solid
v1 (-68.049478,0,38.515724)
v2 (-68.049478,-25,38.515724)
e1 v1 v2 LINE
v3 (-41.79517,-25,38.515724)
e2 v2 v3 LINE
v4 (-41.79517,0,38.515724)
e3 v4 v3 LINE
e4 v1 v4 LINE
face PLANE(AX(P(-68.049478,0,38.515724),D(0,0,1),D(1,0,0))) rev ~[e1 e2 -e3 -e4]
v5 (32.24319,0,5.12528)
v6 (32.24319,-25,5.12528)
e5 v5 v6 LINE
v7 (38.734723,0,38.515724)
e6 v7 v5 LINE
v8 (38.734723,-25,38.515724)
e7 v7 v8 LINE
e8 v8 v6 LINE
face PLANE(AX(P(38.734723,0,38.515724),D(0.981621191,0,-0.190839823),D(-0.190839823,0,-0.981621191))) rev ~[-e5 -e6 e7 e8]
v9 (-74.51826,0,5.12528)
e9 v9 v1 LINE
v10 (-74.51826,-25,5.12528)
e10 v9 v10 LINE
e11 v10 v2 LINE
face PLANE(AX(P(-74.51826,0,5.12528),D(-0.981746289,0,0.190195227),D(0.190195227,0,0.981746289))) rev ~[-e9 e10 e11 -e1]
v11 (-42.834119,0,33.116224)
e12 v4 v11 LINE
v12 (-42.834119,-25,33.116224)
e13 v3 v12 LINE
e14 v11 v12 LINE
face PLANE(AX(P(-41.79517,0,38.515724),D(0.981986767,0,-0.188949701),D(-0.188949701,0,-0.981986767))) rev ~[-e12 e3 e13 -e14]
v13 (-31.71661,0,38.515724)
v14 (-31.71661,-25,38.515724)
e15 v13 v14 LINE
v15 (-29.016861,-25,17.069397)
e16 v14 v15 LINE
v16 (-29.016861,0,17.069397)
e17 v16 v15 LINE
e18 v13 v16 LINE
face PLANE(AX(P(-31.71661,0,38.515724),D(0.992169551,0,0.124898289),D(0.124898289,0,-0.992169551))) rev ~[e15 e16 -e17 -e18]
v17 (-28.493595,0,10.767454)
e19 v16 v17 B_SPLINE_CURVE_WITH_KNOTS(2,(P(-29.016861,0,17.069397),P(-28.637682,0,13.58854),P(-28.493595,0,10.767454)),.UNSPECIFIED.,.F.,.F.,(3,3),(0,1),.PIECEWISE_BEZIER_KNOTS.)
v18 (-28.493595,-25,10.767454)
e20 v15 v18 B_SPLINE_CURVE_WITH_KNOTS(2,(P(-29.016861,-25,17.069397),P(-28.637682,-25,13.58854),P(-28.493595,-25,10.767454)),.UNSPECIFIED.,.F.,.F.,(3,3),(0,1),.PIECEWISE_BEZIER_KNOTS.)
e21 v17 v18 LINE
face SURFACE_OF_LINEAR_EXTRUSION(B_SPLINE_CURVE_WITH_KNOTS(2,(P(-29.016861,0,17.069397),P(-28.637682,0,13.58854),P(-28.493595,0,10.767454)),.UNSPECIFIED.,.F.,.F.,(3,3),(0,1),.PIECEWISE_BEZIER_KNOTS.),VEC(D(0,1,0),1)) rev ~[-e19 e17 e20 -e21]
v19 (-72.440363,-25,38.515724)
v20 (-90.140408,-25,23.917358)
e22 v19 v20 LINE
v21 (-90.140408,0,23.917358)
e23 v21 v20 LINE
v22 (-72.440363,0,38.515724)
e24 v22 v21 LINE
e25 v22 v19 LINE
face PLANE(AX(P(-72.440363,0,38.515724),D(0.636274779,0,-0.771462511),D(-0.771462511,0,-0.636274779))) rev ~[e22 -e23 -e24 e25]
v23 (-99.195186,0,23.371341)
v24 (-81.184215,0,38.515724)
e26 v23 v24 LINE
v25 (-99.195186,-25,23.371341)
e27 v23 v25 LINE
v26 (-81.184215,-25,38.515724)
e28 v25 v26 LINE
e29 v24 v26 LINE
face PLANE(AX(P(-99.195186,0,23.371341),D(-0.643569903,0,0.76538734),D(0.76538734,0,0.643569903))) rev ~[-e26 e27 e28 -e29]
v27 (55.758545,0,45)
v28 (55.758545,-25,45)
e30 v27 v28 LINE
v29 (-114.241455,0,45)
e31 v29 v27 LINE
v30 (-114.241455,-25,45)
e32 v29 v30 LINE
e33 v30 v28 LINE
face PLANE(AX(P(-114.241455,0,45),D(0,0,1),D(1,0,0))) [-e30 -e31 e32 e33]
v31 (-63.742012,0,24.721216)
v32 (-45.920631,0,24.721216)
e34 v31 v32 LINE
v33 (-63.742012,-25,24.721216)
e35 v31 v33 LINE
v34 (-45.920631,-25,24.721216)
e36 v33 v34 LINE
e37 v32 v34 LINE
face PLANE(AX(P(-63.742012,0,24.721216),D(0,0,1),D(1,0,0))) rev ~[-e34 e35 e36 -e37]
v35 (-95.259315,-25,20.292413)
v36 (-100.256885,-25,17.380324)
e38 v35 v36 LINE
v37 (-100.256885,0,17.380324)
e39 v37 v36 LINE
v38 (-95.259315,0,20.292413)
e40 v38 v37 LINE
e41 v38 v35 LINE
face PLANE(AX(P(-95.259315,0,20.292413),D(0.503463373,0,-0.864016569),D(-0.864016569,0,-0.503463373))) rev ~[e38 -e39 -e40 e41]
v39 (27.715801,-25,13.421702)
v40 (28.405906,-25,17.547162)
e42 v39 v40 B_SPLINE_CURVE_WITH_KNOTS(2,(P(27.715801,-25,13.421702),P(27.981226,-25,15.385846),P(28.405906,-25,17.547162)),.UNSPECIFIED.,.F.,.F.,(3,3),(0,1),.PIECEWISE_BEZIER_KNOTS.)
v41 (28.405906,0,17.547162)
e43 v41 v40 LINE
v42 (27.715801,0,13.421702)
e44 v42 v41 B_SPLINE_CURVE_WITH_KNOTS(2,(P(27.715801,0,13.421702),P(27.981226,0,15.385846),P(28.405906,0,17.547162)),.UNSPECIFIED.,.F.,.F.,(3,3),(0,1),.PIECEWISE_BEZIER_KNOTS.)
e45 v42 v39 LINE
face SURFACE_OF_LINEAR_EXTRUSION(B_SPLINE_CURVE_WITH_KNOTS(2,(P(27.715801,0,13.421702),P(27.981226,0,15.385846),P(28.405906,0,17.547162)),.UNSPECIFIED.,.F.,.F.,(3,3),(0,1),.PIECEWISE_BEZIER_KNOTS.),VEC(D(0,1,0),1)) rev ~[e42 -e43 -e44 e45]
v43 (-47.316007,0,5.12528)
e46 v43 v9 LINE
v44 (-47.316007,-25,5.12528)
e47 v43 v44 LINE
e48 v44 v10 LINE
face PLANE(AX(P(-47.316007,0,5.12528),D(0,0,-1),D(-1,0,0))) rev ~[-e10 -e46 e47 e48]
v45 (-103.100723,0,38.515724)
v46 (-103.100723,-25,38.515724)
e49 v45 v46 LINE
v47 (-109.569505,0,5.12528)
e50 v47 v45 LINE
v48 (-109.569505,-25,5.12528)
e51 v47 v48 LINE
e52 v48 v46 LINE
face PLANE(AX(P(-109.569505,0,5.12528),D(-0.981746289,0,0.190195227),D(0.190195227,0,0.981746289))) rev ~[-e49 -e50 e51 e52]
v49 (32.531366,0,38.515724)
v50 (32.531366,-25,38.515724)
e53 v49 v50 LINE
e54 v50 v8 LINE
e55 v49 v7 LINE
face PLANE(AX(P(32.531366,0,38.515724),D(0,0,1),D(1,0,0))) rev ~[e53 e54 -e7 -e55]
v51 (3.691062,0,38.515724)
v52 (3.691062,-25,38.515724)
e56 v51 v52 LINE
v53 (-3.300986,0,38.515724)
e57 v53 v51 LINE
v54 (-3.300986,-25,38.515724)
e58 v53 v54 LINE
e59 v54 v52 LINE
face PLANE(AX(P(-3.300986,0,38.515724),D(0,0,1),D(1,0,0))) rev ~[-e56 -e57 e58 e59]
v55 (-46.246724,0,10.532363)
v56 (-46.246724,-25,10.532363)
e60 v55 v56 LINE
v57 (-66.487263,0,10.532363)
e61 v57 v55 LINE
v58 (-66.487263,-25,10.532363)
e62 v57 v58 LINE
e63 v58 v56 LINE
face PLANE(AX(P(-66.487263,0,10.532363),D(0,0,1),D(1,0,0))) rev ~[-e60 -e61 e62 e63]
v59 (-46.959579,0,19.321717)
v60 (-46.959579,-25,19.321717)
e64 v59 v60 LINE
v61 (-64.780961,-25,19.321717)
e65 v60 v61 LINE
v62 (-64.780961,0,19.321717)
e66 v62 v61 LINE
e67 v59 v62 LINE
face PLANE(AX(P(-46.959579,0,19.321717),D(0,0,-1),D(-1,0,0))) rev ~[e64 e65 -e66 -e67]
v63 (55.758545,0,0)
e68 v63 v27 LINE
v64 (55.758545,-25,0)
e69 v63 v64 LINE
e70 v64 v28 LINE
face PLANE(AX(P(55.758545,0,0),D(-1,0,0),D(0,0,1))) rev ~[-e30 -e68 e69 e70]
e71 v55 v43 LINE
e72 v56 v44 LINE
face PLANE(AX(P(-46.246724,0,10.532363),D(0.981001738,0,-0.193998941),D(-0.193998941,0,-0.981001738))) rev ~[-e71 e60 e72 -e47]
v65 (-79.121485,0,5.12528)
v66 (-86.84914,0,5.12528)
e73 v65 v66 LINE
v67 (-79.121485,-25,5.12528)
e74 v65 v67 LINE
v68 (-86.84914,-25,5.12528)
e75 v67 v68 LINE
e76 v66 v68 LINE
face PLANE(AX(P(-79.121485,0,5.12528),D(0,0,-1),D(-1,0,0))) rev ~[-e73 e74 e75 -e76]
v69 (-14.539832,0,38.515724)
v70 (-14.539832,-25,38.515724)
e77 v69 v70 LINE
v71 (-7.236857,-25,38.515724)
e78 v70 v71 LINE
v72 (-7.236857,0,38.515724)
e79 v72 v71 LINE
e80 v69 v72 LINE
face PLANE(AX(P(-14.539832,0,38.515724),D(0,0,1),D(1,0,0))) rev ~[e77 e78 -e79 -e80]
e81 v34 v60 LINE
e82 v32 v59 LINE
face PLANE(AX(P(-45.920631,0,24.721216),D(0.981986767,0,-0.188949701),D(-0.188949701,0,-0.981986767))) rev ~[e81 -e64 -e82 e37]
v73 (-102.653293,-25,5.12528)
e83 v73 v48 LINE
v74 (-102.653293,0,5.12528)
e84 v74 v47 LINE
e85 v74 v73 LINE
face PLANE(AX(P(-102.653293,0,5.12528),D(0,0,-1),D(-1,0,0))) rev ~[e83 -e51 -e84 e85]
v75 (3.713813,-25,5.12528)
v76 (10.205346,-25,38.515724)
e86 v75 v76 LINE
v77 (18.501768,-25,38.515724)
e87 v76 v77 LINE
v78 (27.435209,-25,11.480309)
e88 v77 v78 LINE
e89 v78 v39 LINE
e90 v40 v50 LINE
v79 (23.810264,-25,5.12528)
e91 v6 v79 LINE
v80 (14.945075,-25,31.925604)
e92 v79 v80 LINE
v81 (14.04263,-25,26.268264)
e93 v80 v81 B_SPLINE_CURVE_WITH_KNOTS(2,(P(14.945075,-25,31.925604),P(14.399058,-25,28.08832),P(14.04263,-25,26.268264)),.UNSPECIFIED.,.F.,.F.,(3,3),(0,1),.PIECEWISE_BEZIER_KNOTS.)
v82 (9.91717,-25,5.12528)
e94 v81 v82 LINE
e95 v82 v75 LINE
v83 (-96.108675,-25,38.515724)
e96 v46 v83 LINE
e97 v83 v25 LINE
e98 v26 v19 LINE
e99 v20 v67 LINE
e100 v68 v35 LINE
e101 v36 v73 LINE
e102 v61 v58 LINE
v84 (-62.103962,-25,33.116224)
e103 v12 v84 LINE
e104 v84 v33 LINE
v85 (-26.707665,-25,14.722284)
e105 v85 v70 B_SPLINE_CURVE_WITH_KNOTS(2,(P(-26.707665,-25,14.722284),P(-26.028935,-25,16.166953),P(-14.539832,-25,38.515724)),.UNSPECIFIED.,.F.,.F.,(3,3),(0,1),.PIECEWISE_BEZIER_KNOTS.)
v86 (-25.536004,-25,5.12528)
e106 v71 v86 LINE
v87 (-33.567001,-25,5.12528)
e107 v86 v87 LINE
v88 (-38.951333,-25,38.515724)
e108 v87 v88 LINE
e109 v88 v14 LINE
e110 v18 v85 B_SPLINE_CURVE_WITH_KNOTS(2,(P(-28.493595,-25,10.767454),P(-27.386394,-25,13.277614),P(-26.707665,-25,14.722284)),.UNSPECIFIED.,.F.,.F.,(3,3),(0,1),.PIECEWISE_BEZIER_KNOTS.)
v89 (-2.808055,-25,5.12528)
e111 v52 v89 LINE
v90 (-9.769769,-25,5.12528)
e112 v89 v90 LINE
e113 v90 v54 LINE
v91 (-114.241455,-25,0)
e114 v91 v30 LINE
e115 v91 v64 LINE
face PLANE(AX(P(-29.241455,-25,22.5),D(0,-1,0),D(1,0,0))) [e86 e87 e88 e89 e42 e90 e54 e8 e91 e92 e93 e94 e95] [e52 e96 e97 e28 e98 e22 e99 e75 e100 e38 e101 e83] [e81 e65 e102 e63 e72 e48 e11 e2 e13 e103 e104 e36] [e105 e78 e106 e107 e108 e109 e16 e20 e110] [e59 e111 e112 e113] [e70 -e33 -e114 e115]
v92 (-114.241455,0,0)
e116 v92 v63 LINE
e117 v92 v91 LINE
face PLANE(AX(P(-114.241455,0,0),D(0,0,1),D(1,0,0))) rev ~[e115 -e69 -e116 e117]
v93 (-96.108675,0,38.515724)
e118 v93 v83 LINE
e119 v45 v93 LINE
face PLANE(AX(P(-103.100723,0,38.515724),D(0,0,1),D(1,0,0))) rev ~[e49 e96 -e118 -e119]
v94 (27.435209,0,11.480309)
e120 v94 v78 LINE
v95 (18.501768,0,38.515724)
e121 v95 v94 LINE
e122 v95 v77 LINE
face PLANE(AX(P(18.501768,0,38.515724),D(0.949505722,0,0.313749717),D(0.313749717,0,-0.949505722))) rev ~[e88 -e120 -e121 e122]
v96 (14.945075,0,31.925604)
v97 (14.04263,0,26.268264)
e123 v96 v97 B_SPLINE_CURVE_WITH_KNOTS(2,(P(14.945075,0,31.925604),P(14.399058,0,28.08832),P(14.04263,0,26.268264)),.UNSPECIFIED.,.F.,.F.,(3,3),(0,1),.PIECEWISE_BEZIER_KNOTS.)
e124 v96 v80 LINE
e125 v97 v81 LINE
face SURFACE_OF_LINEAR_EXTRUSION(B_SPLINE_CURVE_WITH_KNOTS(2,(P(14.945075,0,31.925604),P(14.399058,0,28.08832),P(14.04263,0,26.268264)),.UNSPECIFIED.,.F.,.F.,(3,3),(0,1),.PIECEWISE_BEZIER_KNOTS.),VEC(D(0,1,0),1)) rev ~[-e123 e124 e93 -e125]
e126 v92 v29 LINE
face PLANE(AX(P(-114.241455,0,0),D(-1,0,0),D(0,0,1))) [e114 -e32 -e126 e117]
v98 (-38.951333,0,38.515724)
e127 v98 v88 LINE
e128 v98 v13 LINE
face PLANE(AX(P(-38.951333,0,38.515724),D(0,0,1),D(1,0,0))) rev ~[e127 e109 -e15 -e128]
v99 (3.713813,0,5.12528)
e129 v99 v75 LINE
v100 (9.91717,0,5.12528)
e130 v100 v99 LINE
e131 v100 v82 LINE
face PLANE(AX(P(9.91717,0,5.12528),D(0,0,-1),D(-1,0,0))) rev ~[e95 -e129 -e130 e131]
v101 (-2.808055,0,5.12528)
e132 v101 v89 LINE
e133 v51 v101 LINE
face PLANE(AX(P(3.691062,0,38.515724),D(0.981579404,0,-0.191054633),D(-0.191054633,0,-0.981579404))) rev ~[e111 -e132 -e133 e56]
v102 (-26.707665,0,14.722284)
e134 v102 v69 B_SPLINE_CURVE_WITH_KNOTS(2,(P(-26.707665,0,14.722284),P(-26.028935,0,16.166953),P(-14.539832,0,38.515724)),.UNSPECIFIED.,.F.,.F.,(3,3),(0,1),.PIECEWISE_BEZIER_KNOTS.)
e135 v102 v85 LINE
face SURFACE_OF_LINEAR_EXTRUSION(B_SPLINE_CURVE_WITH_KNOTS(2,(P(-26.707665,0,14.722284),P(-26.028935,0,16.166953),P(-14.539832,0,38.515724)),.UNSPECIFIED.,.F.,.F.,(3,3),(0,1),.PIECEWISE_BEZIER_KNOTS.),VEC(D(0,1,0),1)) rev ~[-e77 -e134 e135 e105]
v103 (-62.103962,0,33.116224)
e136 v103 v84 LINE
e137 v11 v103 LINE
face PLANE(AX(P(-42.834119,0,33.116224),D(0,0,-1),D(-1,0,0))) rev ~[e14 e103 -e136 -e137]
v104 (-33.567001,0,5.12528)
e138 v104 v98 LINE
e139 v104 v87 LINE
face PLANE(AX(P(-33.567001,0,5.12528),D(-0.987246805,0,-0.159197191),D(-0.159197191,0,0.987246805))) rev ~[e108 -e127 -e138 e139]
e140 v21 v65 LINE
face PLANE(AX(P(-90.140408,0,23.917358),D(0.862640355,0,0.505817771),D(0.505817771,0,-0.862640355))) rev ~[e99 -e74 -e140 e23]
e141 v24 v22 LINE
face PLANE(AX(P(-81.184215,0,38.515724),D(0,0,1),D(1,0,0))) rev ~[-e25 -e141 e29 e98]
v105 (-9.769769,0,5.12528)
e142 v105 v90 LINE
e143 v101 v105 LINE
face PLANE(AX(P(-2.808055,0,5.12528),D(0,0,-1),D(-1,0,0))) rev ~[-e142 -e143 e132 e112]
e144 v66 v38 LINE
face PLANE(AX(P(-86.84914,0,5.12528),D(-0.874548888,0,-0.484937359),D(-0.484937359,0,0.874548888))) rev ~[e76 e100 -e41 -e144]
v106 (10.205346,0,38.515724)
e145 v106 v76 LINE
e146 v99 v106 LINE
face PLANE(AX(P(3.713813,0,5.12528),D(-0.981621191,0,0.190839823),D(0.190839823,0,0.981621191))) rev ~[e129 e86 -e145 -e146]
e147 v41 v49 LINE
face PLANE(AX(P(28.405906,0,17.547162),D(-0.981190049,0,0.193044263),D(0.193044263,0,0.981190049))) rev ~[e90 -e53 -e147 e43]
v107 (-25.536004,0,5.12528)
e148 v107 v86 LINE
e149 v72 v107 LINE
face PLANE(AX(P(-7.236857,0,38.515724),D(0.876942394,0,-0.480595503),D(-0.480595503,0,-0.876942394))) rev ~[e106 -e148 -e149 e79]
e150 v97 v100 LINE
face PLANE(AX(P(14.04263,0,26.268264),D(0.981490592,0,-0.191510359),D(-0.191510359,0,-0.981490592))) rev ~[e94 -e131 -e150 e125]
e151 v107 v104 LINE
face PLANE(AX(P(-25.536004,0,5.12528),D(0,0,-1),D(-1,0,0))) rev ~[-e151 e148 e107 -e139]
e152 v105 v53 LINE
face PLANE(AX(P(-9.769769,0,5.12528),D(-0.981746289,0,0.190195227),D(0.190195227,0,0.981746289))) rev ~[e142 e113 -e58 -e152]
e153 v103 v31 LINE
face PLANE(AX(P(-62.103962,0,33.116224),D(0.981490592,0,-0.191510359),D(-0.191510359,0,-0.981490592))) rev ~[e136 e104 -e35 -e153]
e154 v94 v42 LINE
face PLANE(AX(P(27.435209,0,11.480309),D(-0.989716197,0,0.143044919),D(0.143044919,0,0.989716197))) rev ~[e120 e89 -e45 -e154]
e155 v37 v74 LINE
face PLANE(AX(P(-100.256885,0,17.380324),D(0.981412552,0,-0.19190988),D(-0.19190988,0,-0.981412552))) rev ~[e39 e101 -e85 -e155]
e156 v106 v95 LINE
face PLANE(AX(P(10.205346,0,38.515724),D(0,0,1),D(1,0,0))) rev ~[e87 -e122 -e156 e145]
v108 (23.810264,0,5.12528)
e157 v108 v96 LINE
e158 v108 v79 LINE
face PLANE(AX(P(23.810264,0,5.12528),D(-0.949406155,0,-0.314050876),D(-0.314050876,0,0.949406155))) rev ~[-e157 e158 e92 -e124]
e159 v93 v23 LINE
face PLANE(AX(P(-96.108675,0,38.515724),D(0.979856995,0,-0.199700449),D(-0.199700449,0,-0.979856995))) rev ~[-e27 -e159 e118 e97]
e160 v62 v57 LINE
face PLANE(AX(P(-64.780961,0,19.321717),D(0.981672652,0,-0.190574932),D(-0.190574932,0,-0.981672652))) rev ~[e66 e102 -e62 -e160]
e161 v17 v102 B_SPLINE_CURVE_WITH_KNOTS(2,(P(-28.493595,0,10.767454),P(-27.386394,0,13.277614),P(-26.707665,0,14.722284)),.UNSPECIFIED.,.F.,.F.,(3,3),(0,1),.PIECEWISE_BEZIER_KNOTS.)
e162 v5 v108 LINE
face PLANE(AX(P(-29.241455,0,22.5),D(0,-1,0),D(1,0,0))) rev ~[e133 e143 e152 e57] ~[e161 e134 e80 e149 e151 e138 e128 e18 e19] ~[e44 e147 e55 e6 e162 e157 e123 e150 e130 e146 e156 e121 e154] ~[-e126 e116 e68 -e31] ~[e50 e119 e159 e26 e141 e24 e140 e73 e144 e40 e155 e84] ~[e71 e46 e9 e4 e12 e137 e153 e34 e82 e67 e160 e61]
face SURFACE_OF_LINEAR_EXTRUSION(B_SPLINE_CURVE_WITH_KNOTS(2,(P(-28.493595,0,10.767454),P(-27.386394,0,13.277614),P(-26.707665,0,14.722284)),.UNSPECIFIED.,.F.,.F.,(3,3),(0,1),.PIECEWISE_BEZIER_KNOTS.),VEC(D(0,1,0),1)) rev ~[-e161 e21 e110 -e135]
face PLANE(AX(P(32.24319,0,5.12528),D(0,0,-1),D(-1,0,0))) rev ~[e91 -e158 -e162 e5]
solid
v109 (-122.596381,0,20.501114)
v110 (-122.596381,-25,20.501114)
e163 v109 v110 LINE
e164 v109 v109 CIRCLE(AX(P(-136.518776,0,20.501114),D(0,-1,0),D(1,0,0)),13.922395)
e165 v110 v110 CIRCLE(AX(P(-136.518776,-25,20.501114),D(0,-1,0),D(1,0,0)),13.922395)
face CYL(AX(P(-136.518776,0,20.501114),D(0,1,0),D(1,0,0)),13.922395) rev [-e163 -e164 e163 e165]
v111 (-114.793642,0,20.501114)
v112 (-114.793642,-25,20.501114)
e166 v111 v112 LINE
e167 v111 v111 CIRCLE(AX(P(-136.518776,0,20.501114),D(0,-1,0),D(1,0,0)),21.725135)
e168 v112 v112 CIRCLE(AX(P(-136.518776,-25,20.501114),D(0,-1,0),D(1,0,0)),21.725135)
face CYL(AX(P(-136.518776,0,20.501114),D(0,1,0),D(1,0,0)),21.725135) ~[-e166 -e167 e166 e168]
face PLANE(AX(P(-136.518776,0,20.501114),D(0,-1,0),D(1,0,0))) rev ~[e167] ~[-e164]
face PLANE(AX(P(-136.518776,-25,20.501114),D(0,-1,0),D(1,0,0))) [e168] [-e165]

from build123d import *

# Parameters (mm, degrees)
F0_W     = 170
F0_H     = 45
F1_DEPTH = 25
F0_R     = 21.7251346757
F0_R_2   = 13.9223950692


with BuildPart() as f1:
    # F0 (on Front) → F1 (new body)
    with BuildSketch(Plane.XZ):
        with Locations((-29.2414551138, 22.5)):
            Rectangle(F0_W, F0_H)
        Polygon((-79.1214853234, 5.125280004), (-86.849139698, 5.125280004), (-95.2593150675, 20.2924132221), (-100.2568854628, 17.3803236442), (-102.6532925113, 5.125280004), (-109.5695052588, 5.125280004), (-103.1007229412, 38.5157237837), (-96.1086745277, 38.5157237837), (-99.1951861376, 23.3713412654), (-81.1842154411, 38.5157237837), (-72.4403631408, 38.5157237837), (-90.1404076064, 23.9173580612), align=None, mode=Mode.SUBTRACT)
        Polygon((-47.316006965, 5.125280004), (-74.5182603917, 5.125280004), (-68.0494780742, 38.5157237837), (-41.7951704737, 38.5157237837), (-42.8341190991, 33.116224358), (-62.1039618527, 33.116224358), (-63.7420122403, 24.7212161218), (-45.920630709, 24.7212161218), (-46.9595793344, 19.3217166961), (-64.7809608657, 19.3217166961), (-66.4872633527, 10.5323629962), (-46.2467240732, 10.5323629962), align=None, mode=Mode.SUBTRACT)
        with BuildLine():
            Line((-7.2368574362, 38.5157237837), (-25.5360036638, 5.125280004))
            Line((-25.5360036638, 5.125280004), (-33.5670007028, 5.125280004))
            Line((-33.5670007028, 5.125280004), (-38.9513329953, 38.5157237837))
            Line((-38.9513329953, 38.5157237837), (-31.7166104502, 38.5157237837))
            Line((-31.7166104502, 38.5157237837), (-29.0168607374, 17.0693974133))
            add(Edge.make_bspline(
                [(-29.0168607374, 17.0693974133), (-28.637682407, 13.5885403397), (-28.4935946414, 10.7674535611)],
                knots=[0, 0, 0, 1, 1, 1], degree=2))
            add(Edge.make_bspline(
                [(-28.4935946414, 10.7674535611), (-27.3863939165, 13.2776141087), (-26.7076647049, 14.7222835478)],
                knots=[0, 0, 0, 1, 1, 1], degree=2))
            add(Edge.make_bspline(
                [(-26.7076647049, 14.7222835478), (-26.0289354934, 16.1669529868), (-14.5398320807, 38.5157237837)],
                knots=[0, 0, 0, 1, 1, 1], degree=2))
            Line((-14.5398320807, 38.5157237837), (-7.2368574362, 38.5157237837))
        make_face(mode=Mode.SUBTRACT)
        Polygon((-2.8080545365, 5.125280004), (-9.7697686836, 5.125280004), (-3.3009863661, 38.5157237837), (3.6910620474, 38.5157237837), align=None, mode=Mode.SUBTRACT)
        with BuildLine():
            Line((32.2431903305, 5.125280004), (23.8102642613, 5.125280004))
            Line((23.8102642613, 5.125280004), (14.9450748953, 31.9256044004))
            add(Edge.make_bspline(
                [(14.9450748953, 31.9256044004), (14.3990580994, 28.0883196962), (14.0426304688, 26.26826371)],
                knots=[0, 0, 0, 1, 1, 1], degree=2))
            Line((14.0426304688, 26.26826371), (9.9171702335, 5.125280004))
            Line((9.9171702335, 5.125280004), (3.7138127473, 5.125280004))
            Line((3.7138127473, 5.125280004), (10.2053457646, 38.5157237837))
            Line((10.2053457646, 38.5157237837), (18.5017676349, 38.5157237837))
            Line((18.5017676349, 38.5157237837), (27.4352091004, 11.4803088224))
            Line((27.4352091004, 11.4803088224), (27.7158010649, 13.4217018743))
            add(Edge.make_bspline(
                [(27.7158010649, 13.4217018743), (27.9812258962, 15.385845626), (28.4059056263, 17.5471621096)],
                knots=[0, 0, 0, 1, 1, 1], degree=2))
            Line((28.4059056263, 17.5471621096), (32.5313658617, 38.5157237837))
            Line((32.5313658617, 38.5157237837), (38.7347233479, 38.5157237837))
            Line((38.7347233479, 38.5157237837), (32.2431903305, 5.125280004))
        make_face(mode=Mode.SUBTRACT)
    extrude(amount=F1_DEPTH)


with BuildPart() as f1b:
    # F0 (on Front) → F1, piece 2 (new body)
    with BuildSketch(Plane.XZ):
        with Locations((-136.5187764168, 20.501114428)):
            Circle(F0_R)
        with Locations((-136.5187764168, 20.501114428)):
            Circle(F0_R_2, mode=Mode.SUBTRACT)
    extrude(amount=F1_DEPTH)


solid = Compound([f1.part, f1b.part])
